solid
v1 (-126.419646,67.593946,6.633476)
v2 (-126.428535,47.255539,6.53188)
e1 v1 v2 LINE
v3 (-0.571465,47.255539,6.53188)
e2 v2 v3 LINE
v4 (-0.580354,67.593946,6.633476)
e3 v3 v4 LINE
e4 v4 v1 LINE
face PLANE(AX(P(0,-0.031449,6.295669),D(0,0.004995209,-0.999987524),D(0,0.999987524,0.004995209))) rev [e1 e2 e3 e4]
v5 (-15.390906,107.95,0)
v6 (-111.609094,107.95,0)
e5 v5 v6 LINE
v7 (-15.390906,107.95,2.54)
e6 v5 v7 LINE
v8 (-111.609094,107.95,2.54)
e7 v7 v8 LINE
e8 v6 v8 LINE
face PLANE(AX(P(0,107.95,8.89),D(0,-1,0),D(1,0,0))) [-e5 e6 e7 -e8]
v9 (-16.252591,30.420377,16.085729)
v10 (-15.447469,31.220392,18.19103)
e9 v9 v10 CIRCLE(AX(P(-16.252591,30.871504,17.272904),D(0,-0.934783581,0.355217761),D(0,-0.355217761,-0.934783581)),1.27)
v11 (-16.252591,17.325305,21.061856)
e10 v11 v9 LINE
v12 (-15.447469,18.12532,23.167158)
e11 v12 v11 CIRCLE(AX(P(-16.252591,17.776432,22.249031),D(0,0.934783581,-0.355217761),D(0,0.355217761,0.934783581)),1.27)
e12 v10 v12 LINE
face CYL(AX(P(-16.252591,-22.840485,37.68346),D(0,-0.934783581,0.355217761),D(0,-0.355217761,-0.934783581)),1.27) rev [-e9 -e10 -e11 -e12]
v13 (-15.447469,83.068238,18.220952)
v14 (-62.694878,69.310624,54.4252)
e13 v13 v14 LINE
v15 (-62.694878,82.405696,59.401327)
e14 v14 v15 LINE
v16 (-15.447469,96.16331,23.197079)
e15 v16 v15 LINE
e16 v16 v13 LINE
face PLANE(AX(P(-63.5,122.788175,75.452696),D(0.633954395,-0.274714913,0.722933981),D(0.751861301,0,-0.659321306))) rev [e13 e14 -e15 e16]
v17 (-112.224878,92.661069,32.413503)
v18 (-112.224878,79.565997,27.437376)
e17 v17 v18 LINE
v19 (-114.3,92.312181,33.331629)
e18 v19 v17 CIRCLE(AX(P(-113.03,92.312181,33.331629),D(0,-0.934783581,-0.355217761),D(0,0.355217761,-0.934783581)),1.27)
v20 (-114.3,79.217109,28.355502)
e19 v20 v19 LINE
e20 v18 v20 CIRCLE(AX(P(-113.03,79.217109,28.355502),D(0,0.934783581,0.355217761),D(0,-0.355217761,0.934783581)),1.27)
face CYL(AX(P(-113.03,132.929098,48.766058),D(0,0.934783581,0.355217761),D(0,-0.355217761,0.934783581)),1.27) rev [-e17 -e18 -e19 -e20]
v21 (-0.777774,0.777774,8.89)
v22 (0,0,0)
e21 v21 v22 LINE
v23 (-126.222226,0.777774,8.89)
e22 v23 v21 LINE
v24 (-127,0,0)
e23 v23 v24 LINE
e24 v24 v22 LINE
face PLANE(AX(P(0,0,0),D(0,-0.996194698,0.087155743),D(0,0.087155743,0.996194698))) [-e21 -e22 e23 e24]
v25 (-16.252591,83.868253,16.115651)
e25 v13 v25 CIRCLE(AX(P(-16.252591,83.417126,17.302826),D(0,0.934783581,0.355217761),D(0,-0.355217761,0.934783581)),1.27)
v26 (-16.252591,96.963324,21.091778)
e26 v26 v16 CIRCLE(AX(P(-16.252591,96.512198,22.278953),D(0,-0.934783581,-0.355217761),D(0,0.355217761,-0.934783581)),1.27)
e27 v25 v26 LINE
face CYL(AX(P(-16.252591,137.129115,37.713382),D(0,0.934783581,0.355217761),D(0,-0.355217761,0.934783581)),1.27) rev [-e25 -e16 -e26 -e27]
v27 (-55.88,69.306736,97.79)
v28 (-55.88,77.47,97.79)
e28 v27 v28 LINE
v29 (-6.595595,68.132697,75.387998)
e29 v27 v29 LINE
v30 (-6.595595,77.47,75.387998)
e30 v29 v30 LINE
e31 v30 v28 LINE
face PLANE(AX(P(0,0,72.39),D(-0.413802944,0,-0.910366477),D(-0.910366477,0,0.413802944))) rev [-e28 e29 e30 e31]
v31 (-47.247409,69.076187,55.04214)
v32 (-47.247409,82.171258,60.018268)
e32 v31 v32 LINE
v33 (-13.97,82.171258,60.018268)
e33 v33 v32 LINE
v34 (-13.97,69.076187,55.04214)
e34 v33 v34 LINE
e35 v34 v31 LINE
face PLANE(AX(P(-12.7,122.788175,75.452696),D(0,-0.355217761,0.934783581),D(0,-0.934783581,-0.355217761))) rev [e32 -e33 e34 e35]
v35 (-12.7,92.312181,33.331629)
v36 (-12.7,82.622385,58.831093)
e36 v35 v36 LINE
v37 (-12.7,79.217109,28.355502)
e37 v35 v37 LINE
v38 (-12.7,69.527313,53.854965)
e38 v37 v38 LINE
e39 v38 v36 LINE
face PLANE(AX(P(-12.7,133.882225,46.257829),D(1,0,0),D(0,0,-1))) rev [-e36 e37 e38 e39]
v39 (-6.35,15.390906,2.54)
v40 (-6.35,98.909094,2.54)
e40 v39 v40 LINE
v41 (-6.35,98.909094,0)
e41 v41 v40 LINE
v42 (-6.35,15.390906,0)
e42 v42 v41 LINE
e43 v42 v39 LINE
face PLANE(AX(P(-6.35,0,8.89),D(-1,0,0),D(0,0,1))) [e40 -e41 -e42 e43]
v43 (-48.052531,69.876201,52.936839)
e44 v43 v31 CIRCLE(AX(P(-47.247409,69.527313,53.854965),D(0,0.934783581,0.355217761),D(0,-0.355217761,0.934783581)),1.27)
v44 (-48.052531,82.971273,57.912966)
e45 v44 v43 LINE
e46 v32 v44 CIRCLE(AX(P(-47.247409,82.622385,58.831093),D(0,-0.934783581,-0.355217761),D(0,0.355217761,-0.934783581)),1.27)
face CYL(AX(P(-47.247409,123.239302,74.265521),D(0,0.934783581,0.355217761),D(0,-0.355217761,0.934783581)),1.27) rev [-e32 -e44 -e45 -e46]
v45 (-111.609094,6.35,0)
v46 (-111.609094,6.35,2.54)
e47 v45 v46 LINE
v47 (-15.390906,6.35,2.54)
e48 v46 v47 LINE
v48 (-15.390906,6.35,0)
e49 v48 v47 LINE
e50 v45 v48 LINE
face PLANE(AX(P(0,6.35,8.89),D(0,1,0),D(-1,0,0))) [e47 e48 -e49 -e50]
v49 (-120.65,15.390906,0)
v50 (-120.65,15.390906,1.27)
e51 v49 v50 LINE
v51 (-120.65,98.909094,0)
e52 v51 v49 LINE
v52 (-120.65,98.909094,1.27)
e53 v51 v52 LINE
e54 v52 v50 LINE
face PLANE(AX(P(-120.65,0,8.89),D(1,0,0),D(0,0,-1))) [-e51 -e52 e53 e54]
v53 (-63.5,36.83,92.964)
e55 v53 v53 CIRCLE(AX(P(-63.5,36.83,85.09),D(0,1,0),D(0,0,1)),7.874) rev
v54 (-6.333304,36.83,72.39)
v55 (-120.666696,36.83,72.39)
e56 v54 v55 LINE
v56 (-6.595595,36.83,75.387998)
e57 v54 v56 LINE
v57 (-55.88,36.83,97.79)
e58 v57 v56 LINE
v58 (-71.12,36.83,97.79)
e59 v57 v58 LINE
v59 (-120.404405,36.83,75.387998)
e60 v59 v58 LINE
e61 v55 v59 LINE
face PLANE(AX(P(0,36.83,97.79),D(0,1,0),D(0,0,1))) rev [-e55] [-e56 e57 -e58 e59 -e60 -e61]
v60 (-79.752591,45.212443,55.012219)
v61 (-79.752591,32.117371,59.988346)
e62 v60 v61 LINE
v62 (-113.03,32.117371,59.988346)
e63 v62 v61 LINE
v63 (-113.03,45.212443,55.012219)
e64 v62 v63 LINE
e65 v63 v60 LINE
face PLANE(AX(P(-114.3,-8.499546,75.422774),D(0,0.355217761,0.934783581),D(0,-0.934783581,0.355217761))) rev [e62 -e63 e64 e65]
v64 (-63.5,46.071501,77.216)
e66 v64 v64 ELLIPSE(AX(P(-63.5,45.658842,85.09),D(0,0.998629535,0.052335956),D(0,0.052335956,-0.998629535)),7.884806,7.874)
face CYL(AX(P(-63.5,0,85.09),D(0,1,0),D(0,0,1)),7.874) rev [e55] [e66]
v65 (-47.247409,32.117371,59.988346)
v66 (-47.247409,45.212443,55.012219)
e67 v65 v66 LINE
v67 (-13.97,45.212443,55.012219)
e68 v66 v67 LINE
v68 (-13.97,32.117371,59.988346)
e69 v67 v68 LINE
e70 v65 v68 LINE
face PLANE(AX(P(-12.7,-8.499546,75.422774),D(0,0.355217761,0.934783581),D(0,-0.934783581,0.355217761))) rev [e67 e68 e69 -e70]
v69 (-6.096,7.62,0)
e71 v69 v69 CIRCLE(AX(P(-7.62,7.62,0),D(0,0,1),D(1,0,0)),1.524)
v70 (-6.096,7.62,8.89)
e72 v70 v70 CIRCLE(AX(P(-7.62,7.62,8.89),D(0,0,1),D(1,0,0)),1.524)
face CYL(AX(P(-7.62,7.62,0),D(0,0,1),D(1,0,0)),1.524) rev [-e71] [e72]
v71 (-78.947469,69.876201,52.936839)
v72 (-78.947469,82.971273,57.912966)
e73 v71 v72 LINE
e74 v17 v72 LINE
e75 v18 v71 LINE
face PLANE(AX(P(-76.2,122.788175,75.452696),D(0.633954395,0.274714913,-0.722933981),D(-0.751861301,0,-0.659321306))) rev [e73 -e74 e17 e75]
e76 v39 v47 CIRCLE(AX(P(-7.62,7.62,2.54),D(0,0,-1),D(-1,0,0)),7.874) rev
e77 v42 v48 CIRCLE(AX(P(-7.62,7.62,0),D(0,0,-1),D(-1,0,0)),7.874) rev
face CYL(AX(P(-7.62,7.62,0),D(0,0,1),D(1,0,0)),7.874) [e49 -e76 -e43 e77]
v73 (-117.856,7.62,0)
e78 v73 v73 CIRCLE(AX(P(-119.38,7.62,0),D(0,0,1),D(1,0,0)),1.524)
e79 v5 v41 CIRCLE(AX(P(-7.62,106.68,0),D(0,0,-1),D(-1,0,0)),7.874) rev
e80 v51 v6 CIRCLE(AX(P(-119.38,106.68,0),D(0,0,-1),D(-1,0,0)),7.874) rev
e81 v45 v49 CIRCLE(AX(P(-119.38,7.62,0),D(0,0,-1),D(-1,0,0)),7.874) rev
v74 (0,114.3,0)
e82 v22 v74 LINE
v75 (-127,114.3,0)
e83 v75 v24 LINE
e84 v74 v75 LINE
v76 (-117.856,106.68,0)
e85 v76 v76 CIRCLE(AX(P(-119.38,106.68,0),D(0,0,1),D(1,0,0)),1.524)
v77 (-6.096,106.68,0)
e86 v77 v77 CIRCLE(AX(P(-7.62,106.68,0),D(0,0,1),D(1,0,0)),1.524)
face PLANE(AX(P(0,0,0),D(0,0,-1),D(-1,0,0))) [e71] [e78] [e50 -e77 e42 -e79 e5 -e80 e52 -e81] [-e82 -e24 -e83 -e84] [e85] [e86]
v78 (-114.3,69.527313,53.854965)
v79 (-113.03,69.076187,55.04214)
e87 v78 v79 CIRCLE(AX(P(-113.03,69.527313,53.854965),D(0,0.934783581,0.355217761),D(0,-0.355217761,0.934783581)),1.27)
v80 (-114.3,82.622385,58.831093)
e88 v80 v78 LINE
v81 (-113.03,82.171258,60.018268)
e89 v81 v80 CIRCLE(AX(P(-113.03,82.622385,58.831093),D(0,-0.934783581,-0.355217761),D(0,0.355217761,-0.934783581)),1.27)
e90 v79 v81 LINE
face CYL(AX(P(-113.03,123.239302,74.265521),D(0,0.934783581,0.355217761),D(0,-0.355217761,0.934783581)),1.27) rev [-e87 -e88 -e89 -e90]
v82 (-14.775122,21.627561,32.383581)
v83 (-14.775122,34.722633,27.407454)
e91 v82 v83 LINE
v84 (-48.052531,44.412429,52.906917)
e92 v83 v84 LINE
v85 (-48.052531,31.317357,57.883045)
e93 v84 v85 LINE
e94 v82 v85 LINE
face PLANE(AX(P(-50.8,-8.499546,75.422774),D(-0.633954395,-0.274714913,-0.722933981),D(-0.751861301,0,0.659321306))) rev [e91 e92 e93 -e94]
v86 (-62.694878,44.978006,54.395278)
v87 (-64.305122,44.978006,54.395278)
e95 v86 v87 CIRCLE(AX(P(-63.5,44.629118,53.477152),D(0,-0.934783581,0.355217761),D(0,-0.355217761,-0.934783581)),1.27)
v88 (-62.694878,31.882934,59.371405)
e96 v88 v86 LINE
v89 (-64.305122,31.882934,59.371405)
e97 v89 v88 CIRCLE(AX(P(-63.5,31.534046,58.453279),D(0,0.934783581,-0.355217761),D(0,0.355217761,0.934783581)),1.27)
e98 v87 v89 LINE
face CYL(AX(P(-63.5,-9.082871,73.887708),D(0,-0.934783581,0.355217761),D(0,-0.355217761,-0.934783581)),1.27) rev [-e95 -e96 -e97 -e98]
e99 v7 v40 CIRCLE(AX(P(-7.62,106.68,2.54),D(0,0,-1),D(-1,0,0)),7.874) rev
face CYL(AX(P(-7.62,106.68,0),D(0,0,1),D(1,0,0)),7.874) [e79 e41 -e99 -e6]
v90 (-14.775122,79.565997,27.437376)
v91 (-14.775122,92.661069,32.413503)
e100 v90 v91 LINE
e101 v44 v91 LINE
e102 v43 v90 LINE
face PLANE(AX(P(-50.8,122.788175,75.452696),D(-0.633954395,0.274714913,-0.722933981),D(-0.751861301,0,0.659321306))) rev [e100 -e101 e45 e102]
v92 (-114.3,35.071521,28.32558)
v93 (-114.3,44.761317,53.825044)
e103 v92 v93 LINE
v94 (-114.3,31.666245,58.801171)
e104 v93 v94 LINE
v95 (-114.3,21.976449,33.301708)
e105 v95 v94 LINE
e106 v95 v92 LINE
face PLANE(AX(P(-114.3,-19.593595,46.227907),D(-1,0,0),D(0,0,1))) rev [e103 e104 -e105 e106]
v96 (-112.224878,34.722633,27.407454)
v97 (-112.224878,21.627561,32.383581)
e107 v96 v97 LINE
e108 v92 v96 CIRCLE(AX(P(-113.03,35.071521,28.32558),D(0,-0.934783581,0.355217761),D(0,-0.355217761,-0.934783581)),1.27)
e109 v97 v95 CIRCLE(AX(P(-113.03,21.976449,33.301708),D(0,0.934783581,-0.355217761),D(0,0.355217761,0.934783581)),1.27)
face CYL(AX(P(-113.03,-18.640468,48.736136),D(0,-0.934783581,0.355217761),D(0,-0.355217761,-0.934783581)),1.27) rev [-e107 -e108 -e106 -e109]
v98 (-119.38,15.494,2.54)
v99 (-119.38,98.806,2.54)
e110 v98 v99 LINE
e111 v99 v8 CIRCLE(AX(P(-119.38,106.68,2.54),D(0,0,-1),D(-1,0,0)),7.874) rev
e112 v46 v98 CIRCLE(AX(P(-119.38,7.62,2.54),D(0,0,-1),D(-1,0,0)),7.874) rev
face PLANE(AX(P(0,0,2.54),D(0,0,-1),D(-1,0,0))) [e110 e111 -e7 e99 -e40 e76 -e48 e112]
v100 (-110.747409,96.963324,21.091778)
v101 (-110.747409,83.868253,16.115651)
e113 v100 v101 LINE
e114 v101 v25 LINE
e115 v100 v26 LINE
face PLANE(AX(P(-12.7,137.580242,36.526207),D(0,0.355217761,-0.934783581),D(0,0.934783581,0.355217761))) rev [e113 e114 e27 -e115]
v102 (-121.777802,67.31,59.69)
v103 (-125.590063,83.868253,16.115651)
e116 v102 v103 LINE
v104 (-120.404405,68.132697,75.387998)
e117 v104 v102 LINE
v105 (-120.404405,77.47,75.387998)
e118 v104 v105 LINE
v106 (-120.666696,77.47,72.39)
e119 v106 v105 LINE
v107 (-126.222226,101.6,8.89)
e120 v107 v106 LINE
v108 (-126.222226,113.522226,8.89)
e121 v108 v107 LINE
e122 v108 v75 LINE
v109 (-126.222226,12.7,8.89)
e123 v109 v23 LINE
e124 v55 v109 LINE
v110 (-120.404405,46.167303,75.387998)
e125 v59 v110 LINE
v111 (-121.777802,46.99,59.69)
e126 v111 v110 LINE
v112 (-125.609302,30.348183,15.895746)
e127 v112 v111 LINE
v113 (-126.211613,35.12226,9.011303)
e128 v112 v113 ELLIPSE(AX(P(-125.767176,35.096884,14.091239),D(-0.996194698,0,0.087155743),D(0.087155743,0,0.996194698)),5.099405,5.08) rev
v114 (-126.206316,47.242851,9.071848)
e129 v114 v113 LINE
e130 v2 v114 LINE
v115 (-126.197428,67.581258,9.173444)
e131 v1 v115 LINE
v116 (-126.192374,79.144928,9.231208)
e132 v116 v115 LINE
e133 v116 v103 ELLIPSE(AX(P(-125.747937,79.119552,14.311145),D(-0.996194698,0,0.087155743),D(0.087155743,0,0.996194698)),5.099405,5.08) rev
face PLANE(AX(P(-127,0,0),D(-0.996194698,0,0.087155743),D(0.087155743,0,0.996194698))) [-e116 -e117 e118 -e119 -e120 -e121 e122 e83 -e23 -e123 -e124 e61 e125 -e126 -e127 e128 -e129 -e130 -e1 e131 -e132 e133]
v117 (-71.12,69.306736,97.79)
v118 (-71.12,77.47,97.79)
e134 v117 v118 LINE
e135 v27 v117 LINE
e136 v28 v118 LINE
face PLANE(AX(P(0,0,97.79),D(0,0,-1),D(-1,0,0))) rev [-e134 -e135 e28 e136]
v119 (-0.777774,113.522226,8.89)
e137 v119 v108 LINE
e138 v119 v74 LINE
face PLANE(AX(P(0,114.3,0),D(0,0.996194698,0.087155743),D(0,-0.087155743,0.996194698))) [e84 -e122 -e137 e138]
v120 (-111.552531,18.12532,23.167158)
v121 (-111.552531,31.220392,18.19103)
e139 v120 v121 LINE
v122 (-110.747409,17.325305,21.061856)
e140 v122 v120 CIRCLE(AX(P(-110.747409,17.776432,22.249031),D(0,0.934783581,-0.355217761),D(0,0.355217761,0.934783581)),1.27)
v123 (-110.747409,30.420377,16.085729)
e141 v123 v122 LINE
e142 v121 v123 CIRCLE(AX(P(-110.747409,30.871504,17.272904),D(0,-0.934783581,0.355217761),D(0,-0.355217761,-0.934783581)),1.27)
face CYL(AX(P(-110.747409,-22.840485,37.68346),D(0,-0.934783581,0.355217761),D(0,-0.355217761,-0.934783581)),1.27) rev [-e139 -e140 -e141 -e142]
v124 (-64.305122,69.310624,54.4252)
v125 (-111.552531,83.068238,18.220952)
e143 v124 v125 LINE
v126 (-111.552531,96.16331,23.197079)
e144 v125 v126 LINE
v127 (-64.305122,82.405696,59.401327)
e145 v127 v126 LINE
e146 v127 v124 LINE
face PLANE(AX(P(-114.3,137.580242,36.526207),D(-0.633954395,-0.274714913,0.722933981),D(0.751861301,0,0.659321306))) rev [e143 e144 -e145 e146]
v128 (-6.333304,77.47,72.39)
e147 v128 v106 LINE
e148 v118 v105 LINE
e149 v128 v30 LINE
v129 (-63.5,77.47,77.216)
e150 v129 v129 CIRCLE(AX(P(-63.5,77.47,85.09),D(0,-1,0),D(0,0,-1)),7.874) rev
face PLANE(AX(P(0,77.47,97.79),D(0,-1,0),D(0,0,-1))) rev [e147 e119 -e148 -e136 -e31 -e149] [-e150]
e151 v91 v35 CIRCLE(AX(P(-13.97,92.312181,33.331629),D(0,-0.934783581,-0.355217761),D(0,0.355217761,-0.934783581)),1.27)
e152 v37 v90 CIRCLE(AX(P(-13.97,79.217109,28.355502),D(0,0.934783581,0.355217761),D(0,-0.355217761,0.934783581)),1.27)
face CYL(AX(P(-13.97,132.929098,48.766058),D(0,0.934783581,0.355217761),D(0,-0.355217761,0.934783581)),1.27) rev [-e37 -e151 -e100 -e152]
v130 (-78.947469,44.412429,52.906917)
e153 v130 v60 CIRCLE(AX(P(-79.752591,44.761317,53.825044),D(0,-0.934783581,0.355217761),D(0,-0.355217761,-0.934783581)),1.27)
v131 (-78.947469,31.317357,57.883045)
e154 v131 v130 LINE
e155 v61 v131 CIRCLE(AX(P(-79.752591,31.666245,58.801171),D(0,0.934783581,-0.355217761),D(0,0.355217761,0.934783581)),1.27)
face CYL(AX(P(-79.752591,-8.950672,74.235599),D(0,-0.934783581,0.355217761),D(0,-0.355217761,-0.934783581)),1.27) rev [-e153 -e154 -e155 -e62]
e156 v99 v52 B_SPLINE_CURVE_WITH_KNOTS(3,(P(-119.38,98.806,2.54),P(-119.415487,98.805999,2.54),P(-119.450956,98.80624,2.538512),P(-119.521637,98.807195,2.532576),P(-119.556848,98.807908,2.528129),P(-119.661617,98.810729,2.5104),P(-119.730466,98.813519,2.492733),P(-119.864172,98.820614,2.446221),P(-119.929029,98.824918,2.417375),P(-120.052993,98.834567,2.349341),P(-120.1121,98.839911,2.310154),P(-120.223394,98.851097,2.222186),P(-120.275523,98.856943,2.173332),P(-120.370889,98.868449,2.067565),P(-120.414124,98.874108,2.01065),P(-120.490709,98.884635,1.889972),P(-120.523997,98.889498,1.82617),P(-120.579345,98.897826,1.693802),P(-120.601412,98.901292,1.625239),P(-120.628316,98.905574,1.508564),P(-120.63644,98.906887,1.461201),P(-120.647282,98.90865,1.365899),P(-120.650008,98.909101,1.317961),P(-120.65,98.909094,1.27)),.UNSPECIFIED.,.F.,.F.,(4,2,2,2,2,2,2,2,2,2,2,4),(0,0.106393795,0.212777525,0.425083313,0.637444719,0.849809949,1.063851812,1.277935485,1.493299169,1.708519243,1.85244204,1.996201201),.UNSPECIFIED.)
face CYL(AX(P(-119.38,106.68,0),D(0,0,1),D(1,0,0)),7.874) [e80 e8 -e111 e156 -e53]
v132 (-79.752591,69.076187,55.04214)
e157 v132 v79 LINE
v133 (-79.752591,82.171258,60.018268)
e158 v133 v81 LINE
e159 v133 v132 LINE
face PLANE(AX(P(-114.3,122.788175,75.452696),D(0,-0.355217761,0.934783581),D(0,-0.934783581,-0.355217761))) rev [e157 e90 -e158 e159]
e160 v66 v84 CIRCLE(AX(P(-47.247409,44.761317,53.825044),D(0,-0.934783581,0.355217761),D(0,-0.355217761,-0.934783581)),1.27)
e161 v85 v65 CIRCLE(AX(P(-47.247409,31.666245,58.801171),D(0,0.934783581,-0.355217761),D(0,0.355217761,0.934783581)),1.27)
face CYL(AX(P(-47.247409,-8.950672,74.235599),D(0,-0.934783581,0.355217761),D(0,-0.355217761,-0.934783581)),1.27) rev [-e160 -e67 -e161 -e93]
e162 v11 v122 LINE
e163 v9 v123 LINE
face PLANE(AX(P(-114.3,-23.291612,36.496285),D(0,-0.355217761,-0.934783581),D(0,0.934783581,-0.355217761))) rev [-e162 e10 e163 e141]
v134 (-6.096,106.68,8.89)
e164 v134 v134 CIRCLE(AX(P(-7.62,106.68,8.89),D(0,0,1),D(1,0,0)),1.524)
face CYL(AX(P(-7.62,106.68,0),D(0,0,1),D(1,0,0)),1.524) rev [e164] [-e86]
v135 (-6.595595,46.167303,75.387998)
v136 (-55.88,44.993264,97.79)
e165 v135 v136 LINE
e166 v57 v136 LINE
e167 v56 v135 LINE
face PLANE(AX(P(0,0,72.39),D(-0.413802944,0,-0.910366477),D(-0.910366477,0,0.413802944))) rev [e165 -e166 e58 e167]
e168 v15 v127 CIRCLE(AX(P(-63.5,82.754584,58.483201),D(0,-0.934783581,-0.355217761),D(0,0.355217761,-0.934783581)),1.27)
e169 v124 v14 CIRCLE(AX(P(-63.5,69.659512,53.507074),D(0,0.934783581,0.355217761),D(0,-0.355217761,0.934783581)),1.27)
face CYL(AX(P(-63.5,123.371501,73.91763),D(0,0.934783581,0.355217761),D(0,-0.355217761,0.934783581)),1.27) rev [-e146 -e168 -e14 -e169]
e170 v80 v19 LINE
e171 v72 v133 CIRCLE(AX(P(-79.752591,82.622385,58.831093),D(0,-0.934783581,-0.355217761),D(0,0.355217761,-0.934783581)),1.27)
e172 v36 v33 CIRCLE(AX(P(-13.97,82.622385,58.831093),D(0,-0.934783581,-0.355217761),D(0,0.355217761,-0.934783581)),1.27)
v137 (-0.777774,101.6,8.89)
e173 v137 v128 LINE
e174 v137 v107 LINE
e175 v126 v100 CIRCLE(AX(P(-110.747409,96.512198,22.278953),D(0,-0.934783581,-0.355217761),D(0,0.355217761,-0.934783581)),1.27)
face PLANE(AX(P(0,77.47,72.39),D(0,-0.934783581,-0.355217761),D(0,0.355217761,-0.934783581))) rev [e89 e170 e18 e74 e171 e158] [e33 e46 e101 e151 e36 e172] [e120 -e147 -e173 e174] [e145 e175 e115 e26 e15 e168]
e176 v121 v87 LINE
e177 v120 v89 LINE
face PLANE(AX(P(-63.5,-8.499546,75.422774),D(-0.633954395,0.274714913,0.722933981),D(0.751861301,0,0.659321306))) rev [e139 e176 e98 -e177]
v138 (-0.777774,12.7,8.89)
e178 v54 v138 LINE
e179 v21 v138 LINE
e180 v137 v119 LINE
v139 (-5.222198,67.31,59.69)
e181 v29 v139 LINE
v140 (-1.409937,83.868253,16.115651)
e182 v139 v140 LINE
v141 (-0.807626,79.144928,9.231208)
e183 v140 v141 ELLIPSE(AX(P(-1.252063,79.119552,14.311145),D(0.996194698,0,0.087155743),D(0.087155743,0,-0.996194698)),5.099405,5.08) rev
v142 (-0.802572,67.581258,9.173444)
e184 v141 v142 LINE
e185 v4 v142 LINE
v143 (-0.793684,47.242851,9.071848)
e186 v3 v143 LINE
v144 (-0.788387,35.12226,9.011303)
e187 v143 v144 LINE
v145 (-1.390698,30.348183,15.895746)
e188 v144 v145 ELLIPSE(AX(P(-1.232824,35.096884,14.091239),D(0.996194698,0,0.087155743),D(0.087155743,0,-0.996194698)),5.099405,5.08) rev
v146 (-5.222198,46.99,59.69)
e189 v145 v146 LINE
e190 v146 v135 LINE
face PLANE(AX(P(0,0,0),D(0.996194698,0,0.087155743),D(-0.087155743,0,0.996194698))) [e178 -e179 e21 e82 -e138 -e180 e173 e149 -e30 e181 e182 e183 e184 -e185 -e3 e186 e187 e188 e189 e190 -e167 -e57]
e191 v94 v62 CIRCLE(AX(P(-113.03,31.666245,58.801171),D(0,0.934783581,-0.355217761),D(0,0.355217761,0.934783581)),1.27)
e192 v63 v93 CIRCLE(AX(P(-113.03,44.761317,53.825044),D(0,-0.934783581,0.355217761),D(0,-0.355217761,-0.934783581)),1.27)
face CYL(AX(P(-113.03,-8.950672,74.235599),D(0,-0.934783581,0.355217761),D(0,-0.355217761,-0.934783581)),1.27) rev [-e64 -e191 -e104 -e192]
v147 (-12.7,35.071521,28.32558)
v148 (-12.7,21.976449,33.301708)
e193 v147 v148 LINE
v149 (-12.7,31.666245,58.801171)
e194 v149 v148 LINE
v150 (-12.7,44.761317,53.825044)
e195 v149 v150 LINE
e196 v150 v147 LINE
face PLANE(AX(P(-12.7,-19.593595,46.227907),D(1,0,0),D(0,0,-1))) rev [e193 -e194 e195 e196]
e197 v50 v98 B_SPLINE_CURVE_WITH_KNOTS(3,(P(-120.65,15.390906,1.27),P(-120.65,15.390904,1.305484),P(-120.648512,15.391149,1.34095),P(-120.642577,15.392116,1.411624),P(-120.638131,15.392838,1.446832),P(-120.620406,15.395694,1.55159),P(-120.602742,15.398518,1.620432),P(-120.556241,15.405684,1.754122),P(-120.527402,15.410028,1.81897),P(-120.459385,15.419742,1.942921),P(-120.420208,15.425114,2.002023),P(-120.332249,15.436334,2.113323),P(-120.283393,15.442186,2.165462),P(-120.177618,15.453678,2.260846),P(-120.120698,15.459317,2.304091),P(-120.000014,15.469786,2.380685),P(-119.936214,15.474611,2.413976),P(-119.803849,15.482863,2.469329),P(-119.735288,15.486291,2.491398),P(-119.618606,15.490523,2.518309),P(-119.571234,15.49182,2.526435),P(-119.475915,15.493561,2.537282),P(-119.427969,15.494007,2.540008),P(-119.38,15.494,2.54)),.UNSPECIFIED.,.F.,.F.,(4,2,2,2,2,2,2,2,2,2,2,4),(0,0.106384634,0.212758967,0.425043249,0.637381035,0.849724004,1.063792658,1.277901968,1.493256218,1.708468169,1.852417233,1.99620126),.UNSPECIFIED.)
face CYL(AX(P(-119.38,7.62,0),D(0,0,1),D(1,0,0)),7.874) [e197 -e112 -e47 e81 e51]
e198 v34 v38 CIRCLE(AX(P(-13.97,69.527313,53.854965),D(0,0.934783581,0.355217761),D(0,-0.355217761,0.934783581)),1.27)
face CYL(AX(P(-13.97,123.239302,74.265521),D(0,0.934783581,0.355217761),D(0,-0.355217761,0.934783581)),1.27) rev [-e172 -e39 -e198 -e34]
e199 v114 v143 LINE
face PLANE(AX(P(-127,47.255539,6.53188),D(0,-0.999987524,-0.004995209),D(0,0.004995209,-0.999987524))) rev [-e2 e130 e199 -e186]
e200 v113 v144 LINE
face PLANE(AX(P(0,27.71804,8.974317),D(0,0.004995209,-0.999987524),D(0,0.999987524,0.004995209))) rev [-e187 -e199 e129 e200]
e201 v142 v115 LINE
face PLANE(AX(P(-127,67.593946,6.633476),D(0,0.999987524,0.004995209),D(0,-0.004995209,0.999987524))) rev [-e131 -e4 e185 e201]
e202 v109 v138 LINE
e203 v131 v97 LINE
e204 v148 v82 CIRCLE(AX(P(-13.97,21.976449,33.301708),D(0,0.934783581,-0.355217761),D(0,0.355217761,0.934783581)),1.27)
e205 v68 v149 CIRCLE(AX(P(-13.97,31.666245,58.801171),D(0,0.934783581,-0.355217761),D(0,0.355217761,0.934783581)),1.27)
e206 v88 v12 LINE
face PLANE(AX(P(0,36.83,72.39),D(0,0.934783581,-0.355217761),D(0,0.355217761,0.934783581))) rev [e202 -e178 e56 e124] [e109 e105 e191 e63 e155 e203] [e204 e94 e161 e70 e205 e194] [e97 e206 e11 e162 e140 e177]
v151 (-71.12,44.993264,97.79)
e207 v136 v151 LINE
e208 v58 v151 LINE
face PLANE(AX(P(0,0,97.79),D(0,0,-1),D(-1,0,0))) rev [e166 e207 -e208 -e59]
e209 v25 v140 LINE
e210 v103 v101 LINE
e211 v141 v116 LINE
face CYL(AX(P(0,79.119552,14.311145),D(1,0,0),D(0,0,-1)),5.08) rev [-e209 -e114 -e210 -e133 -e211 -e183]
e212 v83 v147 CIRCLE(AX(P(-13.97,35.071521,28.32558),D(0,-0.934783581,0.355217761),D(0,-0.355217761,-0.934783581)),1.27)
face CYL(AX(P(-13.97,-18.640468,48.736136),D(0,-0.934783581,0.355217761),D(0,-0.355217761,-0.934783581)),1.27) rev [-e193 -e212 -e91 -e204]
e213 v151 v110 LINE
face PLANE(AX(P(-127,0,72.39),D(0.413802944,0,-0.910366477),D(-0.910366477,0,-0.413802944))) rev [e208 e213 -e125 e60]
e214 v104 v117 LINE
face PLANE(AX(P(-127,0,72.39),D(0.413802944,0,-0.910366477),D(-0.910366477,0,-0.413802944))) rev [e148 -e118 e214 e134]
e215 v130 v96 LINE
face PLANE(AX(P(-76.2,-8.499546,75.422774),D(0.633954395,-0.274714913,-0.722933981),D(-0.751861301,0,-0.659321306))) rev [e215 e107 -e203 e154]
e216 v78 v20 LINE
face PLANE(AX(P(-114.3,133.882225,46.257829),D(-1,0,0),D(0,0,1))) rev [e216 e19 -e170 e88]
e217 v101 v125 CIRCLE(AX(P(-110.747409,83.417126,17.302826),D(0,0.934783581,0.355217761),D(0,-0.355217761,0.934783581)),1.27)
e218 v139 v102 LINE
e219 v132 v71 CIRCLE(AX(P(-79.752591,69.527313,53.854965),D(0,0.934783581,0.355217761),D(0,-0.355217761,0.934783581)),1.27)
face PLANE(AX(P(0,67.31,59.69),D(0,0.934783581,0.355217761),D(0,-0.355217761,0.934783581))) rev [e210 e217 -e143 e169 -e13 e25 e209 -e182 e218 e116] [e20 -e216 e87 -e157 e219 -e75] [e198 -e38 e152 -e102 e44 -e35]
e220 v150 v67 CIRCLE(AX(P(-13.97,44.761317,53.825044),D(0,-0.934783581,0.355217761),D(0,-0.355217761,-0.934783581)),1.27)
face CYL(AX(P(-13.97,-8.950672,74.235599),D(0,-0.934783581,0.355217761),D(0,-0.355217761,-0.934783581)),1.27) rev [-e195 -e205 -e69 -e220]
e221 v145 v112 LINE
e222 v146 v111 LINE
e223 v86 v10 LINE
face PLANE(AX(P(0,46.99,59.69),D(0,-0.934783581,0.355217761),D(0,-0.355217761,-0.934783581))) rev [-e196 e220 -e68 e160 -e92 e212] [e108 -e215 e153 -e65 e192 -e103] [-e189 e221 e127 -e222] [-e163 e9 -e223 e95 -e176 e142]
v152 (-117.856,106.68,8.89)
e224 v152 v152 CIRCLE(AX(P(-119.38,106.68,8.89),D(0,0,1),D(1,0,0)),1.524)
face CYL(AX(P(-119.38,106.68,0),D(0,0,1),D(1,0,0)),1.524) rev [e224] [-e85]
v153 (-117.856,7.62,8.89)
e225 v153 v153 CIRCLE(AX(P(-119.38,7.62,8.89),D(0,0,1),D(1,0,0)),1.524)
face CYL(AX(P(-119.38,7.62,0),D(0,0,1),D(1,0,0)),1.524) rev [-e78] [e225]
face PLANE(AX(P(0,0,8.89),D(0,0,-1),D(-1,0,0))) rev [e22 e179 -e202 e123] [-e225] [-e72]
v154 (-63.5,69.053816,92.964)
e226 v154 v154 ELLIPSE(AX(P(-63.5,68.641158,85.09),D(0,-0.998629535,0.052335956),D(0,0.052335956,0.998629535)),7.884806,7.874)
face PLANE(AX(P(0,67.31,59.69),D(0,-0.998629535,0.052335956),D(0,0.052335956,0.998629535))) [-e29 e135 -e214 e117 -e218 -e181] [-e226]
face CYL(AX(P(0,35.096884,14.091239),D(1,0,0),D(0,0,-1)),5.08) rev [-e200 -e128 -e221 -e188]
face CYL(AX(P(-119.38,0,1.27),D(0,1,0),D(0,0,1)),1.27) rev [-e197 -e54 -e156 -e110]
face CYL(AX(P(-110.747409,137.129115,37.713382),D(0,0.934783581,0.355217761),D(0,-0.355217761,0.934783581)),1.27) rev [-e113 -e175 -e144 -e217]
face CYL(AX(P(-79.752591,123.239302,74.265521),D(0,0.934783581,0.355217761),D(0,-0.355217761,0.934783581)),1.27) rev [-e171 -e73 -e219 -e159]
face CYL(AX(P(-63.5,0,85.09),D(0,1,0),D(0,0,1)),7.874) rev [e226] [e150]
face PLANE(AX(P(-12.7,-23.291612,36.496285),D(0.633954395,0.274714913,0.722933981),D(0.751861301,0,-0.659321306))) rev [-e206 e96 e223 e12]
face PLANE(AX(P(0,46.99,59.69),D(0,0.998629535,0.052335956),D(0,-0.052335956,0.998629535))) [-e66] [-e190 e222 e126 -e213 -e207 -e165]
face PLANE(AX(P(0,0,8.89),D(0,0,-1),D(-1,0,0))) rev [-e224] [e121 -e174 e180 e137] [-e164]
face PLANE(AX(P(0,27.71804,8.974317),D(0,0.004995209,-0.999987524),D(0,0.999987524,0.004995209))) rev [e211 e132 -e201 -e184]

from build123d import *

# Parameters (mm, degrees)
SKETCH3_W           = 114.3
SKETCH3_H           = 127
BOSS_EXTRUDE1_DEPTH = 8.89
SKETCH5_R           = 1.524
CUT_EXTRUDE1_DEPTH  = 172.092145056
SHELL2_T            = -6.35
SKETCH6_W           = 88.9
SKETCH6_H           = 127
BOSS_EXTRUDE2_DEPTH = 88.9
SKETCH8_R           = 7.874
CUT_EXTRUDE2_DEPTH  = 190.774719338
CUT_EXTRUDE3_DEPTH  = 197.866386415
FILLET1_R           = 5.08
CUT_EXTRUDE4_DEPTH  = 165.086159295
CUT_EXTRUDE5_DEPTH  = 190.725297655
FILLET2_R           = 1.27
SKETCH20_W          = 127
SKETCH20_H          = 20.338660629
CUT_EXTRUDE7_DEPTH  = 2.54
DRAFT6_DEPTH        = 114.3
DRAFT6_START        = -128
DRAFT6_2_DEPTH      = 129
DRAFT7_ANGLE        = 3


with BuildPart() as part:
    # Sketch3 → Boss-Extrude1 (new body)
    with BuildSketch(Plane(origin=(0, 0, 0), x_dir=(0, 1, 0), z_dir=(0, 0, 1))):
        with Locations((57.15, 63.5)):
            Rectangle(SKETCH3_W, SKETCH3_H)
    extrude(amount=BOSS_EXTRUDE1_DEPTH)

    # Sketch5 → Cut-Extrude1 (cut, through all)
    with BuildSketch(Plane.XY.offset(8.89)):
        with Locations((-119.38, 7.62)):
            Circle(SKETCH5_R)
        with Locations((-7.62, 7.62)):
            Circle(SKETCH5_R)
        with Locations((-119.38, 106.68)):
            Circle(SKETCH5_R)
        with Locations((-7.62, 106.68)):
            Circle(SKETCH5_R)
    extrude(amount=-CUT_EXTRUDE1_DEPTH, mode=Mode.SUBTRACT)

    # Shell2
    shell2_openings = [part.faces().sort_by_distance(p)[0] for p in [
        (-63.5, 57.15, 0),
    ]]
    offset(amount=SHELL2_T, openings=shell2_openings)

    # Sketch6 → Boss-Extrude2 (add)
    with BuildSketch(Plane(origin=(0, 0, 8.89), x_dir=(0, -1, 0), z_dir=(0, 0, 1))):
        with Locations((-57.15, -63.5)):
            Rectangle(SKETCH6_W, SKETCH6_H)
    extrude(amount=BOSS_EXTRUDE2_DEPTH)

    # Sketch8 → Cut-Extrude2 (cut, through all)
    with BuildSketch(Plane(origin=(0, 101.6, 0), x_dir=(-1, 0, 0), z_dir=(0, 1, 0))):
        with Locations(Location((63.5, 85.09, 0), (0, 0, 90))):
            Circle(SKETCH8_R)
        Polygon((55.88, 97.79), (0, 97.79), (0, 72.39), align=None)
        Polygon((71.12, 97.79), (127, 97.79), (127, 72.39), align=None)
    extrude(amount=-CUT_EXTRUDE2_DEPTH, mode=Mode.SUBTRACT)

    # Sketch9 → Cut-Extrude3 (cut, through all)
    with BuildSketch(Plane(origin=(-127, 0, 0), x_dir=(0, -1, 0), z_dir=(-1, 0, 0))):
        Polygon((-67.31, 97.79), (-46.99, 97.79), (-46.99, 59.69), (-27.718040346, 8.974316699), (-86.47043568, 9.267800843), (-67.31, 59.69), align=None)
        Polygon((-77.47, 97.79), (-77.47, 72.39), (-101.6, 8.89), (-101.6, 97.79), align=None)
        Polygon((-36.83, 97.79), (-36.83, 72.39), (-12.7, 8.89), (-12.7, 97.79), align=None)
    extrude(amount=-CUT_EXTRUDE3_DEPTH, mode=Mode.SUBTRACT)

    # Fillet1
    fillet1_edges = [part.edges().sort_by_distance(p)[0] for p in [
        (-63.5, 27.718040346, 8.974316699),
        (-63.5, 86.47043568, 9.267800843),
    ]]
    fillet(fillet1_edges, radius=FILLET1_R)

    # Sketch16 → Cut-Extrude4 (cut, through all)
    with BuildSketch(Plane(origin=(0, 78.63701503, 29.882065711), x_dir=(1, 0, 0), z_dir=(0, -0.9347835805883491, -0.3552177606235725))):
        Polygon((-12.7, -14.726847163), (-114.3, -14.726847163), (-63.5, 26.915400792), align=None)
        Polygon((-12.7, 26.915400792), (-50.8, 26.915400792), (-12.7, -4.316285174), align=None)
        Polygon((-114.3, -4.316285174), (-114.3, 26.915400792), (-76.2, 26.915400792), align=None)
    extrude(amount=-CUT_EXTRUDE4_DEPTH, mode=Mode.SUBTRACT)

    # Sketch17 → Cut-Extrude5 (cut, through all)
    with BuildSketch(Plane(origin=(0, 21.240650122, -8.071447046), x_dir=(-1, 0, 0), z_dir=(0, 0.934783580588349, -0.3552177606235728))):
        Polygon((114.3, 25.842533623), (12.7, 25.842533623), (63.5, 67.484781577), align=None)
        Polygon((114.3, 67.484781577), (76.2, 67.484781577), (114.3, 36.253095611), align=None)
        Polygon((12.7, 36.253095611), (12.7, 67.484781577), (50.8, 67.484781577), align=None)
    extrude(amount=-CUT_EXTRUDE5_DEPTH, mode=Mode.SUBTRACT)

    # Fillet2
    fillet2_edges = [part.edges().sort_by_distance(p)[0] for p in [
        (-76.2, 75.623722461, 57.530204051),
        (-114.3, 86.71777201, 28.335336816),
        (-114.3, 75.623722461, 57.530204051),
        (-12.7, 75.623722461, 57.530204051),
        (-12.7, 86.71777201, 28.335336816),
        (-50.8, 75.623722461, 57.530204051),
        (-12.7, 90.415788526, 18.603714404),
        (-63.5, 75.623722461, 57.530204051),
        (-114.3, 90.415788526, 18.603714404),
        (-50.8, 38.664907284, 57.500282325),
        (-12.7, 27.570857734, 28.30541509),
        (-12.7, 38.664907284, 57.500282325),
        (-114.3, 38.664907284, 57.500282325),
        (-114.3, 27.570857734, 28.30541509),
        (-76.2, 38.664907284, 57.500282325),
        (-63.5, 38.664907284, 57.500282325),
        (-114.3, 23.872841218, 18.573792679),
        (-12.7, 23.872841218, 18.573792679),
        (-120.65, 57.15, 2.54),
    ]]
    fillet(fillet2_edges, radius=FILLET2_R)

    # Sketch20 → Cut-Extrude7 (cut)
    with BuildSketch(Plane(origin=(0, -0.044136403, 8.8356371), x_dir=(1, 0, 0), z_dir=(0, -0.004995208795198877, 0.9999875238667193))):
        with Locations((-63.5, 57.456908074)):
            Rectangle(SKETCH20_W, SKETCH20_H)
    extrude(amount=-CUT_EXTRUDE7_DEPTH, mode=Mode.SUBTRACT)

    # Draft6: read off the stored shape, not the designer's step
    # Draft6 outline → Draft6 (cut)
    with BuildSketch(Plane(origin=(0, 0, 0), x_dir=(1, 0, 0), z_dir=(0, 1, 0))):
        Polygon((-120.404404826, -75.387997806), (-127, 0), (-127, -72.39), align=None)
        Polygon((0, 0), (-6.595595174, -75.387997806), (0, -72.39), align=None)
    extrude(amount=DRAFT6_DEPTH, mode=Mode.SUBTRACT)

    # Draft6 2 outline → Draft6 2 (cut)
    with BuildSketch(Plane.YZ.offset(DRAFT6_START)):
        Polygon((0, 0), (0.777774219, 8.89), (0, 8.89), align=None)
        Polygon((113.522225781, 8.89), (114.3, 0), (114.3, 8.89), align=None)
    extrude(amount=DRAFT6_2_DEPTH, mode=Mode.SUBTRACT)

    # Draft7
    draft7_faces = [part.faces().sort_by_distance(p)[0] for p in [
        (-63.5, 46.99, 74.057550682),
        (-63.5, 67.31, 74.057550682),
    ]]
    draft(draft7_faces, Plane(origin=(0, 0, 59.69), x_dir=(0, 1, 0), z_dir=(0, 0, 1)), DRAFT7_ANGLE)


solid = part.part
